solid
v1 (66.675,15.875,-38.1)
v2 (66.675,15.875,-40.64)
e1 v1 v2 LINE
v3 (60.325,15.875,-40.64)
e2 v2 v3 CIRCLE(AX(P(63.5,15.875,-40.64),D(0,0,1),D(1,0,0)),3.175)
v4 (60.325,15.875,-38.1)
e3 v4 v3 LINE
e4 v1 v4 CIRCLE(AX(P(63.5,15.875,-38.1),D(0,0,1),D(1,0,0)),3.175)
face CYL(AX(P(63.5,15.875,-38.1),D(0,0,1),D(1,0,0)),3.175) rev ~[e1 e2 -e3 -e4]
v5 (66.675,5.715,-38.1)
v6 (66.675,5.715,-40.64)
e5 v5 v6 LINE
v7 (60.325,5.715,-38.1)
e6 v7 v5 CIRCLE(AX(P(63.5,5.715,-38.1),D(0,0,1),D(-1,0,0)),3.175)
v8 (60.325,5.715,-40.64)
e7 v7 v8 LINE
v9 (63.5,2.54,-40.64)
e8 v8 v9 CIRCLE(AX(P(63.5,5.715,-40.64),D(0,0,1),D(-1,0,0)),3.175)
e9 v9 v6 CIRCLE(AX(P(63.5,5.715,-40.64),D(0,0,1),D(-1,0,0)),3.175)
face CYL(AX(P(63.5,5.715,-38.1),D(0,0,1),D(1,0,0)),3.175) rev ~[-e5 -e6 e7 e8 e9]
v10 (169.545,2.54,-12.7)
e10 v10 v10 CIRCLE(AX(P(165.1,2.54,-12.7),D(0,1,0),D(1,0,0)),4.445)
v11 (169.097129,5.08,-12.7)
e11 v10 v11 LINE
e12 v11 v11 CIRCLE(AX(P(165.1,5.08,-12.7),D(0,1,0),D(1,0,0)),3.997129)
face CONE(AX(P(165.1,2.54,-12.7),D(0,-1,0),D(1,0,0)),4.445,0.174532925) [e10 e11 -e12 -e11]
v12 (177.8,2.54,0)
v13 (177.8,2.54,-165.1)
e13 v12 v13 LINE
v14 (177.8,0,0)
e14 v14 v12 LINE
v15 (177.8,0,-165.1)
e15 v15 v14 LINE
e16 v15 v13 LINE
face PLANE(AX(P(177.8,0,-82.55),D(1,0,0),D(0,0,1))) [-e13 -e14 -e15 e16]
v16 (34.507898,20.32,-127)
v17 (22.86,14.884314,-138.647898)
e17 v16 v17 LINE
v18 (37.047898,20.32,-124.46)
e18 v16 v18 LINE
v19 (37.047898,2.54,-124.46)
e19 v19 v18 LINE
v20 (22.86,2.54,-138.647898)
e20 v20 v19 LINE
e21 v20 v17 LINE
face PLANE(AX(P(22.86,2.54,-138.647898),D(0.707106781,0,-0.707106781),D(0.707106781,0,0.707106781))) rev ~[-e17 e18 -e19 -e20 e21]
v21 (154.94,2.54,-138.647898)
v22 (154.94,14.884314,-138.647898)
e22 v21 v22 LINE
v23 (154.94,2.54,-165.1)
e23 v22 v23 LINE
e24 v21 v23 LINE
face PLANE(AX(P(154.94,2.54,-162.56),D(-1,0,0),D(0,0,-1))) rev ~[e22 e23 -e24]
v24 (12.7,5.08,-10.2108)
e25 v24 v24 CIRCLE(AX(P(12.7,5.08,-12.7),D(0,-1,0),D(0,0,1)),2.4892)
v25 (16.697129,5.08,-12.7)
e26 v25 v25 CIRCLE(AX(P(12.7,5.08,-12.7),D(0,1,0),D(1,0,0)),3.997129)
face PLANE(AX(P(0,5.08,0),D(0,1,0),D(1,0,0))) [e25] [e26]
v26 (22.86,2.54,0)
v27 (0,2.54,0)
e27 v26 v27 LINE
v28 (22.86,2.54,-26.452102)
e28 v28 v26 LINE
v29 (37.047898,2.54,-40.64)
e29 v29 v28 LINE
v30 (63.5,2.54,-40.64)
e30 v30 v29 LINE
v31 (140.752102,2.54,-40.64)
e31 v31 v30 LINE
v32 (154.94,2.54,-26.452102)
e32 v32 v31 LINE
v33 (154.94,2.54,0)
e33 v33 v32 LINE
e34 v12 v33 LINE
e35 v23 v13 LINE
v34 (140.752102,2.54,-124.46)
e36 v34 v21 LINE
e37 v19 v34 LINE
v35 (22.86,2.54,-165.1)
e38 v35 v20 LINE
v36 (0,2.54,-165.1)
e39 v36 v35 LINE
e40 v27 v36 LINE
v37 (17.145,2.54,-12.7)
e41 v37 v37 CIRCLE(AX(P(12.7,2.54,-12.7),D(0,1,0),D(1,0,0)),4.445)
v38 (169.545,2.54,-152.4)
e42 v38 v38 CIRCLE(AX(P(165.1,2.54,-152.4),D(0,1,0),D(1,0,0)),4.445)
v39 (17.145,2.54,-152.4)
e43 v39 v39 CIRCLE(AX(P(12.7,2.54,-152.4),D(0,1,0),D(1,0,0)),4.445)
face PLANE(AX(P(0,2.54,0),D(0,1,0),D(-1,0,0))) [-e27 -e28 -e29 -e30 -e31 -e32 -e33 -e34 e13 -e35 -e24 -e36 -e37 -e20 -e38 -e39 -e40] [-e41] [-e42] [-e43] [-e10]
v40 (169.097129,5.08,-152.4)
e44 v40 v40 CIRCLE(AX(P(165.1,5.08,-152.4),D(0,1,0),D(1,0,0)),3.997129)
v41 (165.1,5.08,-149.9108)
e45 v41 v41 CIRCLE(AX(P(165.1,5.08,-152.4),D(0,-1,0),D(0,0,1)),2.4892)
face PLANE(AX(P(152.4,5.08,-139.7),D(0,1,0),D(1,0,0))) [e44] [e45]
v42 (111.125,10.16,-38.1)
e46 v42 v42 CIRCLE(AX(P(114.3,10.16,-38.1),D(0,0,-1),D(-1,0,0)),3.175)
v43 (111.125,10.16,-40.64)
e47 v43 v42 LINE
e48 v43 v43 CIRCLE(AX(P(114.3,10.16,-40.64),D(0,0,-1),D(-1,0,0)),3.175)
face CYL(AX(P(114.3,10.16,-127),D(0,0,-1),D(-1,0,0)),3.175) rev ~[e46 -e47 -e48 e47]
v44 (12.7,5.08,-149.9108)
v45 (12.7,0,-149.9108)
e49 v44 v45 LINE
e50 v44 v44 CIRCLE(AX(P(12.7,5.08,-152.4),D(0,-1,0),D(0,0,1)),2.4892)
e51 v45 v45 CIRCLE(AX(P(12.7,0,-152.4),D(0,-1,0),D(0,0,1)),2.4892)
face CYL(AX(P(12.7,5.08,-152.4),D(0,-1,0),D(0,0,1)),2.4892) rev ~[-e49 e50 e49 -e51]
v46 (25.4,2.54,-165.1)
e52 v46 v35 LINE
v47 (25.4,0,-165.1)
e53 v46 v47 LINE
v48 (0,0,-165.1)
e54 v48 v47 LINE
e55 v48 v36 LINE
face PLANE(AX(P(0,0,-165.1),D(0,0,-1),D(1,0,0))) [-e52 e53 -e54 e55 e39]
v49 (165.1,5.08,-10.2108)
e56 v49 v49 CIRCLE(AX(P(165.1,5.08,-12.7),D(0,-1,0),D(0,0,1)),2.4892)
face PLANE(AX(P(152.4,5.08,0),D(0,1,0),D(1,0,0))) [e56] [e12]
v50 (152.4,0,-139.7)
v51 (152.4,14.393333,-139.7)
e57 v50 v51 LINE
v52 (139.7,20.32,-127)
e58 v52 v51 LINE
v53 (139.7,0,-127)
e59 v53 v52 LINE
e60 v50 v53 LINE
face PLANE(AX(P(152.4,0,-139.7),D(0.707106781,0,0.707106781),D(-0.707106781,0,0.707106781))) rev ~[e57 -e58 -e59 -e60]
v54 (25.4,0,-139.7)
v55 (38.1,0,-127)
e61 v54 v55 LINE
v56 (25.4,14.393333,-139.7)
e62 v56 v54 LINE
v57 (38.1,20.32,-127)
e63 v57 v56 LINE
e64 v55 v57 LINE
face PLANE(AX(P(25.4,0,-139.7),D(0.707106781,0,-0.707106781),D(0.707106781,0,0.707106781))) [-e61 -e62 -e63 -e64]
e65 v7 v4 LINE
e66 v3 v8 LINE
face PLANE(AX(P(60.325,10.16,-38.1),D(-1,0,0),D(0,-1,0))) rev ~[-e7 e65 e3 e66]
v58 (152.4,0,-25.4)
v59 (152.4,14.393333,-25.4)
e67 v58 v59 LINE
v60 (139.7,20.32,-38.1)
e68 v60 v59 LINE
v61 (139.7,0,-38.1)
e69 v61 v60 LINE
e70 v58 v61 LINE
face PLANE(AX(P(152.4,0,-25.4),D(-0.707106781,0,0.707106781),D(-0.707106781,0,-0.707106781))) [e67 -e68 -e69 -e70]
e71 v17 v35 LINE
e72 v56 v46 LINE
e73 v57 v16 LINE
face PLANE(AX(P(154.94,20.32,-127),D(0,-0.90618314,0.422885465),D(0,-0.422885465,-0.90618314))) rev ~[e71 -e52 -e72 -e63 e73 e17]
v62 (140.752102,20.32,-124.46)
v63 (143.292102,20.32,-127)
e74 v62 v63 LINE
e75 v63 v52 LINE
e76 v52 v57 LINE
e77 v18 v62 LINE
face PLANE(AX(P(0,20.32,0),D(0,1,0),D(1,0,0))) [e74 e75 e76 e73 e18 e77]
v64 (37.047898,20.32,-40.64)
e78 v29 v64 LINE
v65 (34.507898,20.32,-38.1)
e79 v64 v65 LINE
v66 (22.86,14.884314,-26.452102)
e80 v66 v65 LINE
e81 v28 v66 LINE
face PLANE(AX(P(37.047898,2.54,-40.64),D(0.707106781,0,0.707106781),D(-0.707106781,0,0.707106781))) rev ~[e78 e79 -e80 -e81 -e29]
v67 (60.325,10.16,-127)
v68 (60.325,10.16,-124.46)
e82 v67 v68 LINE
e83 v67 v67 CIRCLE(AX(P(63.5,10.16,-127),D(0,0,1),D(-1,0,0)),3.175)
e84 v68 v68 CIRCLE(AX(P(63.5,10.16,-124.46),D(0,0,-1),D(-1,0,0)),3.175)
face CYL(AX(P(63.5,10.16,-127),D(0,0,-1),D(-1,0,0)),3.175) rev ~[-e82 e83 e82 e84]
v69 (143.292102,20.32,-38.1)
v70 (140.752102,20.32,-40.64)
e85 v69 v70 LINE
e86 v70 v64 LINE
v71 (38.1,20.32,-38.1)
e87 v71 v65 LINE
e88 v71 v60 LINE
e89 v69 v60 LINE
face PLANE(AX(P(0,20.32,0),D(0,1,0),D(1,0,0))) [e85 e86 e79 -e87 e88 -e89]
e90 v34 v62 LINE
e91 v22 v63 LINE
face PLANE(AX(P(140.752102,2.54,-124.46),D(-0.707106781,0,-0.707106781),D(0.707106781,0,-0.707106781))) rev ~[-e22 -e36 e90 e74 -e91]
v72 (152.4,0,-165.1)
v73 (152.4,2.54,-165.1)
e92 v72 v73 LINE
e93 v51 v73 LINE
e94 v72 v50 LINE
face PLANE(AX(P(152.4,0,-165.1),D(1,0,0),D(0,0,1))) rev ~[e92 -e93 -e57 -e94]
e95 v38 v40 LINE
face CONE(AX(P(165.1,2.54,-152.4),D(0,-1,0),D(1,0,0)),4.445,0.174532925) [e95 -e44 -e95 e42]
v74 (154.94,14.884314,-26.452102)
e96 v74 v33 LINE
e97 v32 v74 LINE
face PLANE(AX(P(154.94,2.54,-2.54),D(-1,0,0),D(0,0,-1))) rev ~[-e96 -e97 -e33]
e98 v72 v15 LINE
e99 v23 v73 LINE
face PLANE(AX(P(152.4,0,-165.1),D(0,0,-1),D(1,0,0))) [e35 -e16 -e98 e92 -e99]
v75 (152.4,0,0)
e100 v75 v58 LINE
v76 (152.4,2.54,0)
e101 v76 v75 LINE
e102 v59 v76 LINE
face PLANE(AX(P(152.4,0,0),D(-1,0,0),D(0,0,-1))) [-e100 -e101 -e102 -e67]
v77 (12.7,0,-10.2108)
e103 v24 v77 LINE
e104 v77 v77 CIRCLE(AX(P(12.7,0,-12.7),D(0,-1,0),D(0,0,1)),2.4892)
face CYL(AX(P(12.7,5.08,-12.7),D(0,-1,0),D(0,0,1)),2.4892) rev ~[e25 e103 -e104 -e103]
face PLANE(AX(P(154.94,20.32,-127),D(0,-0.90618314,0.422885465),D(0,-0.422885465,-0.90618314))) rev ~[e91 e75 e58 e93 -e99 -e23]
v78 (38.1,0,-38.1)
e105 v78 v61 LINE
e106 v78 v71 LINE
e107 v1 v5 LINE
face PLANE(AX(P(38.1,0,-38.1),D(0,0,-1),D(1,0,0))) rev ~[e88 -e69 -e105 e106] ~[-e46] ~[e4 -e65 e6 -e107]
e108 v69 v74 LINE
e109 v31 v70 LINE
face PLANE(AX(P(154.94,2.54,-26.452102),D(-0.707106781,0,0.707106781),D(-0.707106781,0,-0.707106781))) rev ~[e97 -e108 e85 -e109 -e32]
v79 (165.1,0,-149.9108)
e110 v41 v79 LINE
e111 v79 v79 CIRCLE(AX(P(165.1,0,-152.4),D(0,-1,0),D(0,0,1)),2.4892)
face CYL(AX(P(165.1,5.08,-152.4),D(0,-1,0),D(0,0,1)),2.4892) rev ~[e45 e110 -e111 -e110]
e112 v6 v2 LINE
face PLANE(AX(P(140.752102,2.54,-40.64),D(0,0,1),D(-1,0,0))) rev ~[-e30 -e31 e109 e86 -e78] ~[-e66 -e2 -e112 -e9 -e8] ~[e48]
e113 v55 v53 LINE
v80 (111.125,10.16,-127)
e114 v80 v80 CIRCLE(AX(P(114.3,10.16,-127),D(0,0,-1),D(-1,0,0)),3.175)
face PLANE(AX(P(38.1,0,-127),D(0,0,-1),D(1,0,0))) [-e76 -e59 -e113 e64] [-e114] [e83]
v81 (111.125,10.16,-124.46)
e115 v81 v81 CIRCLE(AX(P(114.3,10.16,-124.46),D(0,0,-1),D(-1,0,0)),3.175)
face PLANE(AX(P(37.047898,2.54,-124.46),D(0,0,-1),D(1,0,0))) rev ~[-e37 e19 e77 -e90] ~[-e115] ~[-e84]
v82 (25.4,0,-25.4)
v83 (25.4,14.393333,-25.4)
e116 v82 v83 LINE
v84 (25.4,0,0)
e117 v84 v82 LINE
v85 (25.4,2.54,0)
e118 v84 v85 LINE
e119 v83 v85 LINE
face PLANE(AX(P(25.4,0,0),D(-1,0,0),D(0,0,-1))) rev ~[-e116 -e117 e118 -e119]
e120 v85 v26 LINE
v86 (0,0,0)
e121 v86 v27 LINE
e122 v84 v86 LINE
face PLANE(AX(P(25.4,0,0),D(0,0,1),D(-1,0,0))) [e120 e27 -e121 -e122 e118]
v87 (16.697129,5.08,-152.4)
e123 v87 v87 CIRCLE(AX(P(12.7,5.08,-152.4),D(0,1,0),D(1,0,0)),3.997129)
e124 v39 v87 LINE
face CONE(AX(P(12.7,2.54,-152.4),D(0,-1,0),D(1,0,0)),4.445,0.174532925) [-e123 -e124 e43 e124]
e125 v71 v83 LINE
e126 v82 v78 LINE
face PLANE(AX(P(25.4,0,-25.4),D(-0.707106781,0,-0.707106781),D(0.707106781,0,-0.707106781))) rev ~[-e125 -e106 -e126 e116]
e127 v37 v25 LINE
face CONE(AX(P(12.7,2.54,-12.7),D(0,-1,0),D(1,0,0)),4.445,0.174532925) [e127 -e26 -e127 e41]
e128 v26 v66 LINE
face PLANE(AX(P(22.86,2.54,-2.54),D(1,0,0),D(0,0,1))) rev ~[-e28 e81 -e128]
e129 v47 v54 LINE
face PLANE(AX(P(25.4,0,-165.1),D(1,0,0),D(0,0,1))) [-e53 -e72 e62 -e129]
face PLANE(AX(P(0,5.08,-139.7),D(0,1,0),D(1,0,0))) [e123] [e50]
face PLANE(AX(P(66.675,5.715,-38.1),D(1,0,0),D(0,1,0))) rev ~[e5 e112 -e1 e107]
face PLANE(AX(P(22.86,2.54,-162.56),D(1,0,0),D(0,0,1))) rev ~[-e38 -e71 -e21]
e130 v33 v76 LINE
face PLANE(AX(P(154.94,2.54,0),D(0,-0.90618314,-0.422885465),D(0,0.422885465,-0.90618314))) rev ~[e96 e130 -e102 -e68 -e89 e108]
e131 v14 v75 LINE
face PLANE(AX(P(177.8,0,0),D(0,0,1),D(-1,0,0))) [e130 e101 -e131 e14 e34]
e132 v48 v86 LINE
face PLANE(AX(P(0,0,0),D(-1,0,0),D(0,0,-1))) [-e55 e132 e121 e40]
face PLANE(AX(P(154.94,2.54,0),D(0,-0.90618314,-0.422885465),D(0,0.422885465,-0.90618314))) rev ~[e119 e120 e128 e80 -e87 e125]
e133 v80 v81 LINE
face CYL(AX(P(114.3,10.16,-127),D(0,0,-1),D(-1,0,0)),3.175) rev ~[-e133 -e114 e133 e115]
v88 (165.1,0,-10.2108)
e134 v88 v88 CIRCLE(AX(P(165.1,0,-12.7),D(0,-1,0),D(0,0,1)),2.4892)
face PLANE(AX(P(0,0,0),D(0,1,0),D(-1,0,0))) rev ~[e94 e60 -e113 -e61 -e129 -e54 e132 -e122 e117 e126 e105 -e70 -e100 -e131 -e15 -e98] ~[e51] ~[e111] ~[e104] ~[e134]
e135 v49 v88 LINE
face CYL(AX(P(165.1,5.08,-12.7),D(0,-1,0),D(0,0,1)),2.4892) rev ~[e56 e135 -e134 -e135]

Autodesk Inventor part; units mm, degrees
ref_plane "YZ Plane" through (0, 0, 0) normal (1, 0, 0) x (0, 1, 0)
ref_plane "XZ Plane" through (0, 0, 0) normal (0, 1, 0) x (-1, 0, 0)
ref_plane "XY Plane" through (0, 0, 0) normal (0, 0, 1) x (1, 0, 0)
sketch "Sketch1" plane through (0, 0, 0) normal (0, 1, 0) x (-1, 0, 0)
  line L0 (0, 0) -> (0, -165.1)
  line L1 (0, -165.1) -> (-177.8, -165.1)
  line L2 (-177.8, -165.1) -> (-177.8, 0)
  line L3 (-177.8, 0) -> (0, 0)
  line L4 (0, 0) -> (-25.4, 0)
  line L5 (-177.8, 0) -> (-152.4, 0)
  line L6 (0, -165.1) -> (-25.4, -165.1)
  line L7 (-177.8, -165.1) -> (-152.4, -165.1)
  line L8 (-152.4, 0) -> (-152.4, -25.4)
  line L9 (-152.4, -165.1) -> (-152.4, -139.7)
  line L10 (-25.4, 0) -> (-25.4, -25.4)
  line L11 (-25.4, -165.1) -> (-25.4, -139.7)
  line L12 (-38.1, -38.1) -> (-139.7, -38.1)
  line L13 (-25.4, -25.4) -> (-38.1, -38.1)
  line L14 (-25.4, -25.4) -> (-7.439488, -25.4) construction
  line L15 (-152.4, -25.4) -> (-139.7, -38.1)
  line L16 (-177.8, -82.55) -> (0, -82.55)
  line L17 (-152.4, -165.1) -> (-152.4, -139.7)
  line L18 (-25.4, -165.1) -> (-25.4, -139.7)
  line L19 (-38.1, -127) -> (-139.7, -127)
  line L20 (-25.4, -139.7) -> (-38.1, -127)
  line L21 (-152.4, -139.7) -> (-139.7, -127)
  dimension "d1" = 165.1
  dimension "d2" = 177.8
  dimension "d3" = 25.4
  dimension "d4" = 25.4
  dimension "d6" = 25.4
  dimension "d7" = 25.4
  dimension "d10" = 25.4
  dimension "d11" = 25.4
  dimension "d12" = 25.4
  dimension "d13" = 25.4
  dimension "d16" = 101.6
  dimension "d17" = 135
  dimension "d18" = 135
extrude "Extrusion1" add sketch "Sketch1" along normal blind 2.54 contours L0 L16 L2 L3 L8 L15 L12 L13 L10 | L0 L1 L11 L20 L19 L21 L9 L2 L16
sketch "Sketch2" plane through (0, 2.54, 0) normal (0, 1, 0) x (1, 0, 0)
  line L0 (25.4, 139.7) -> (25.4, 165.1)
  line L1 (25.4, 165.1) -> (0, 165.1)
  line L2 (0, 165.1) -> (0, 0)
  line L3 (0, 0) -> (25.4, 0)
  line L4 (25.4, 0) -> (25.4, 25.4)
  line L5 (25.4, 25.4) -> (38.1, 38.1)
  line L6 (38.1, 38.1) -> (139.7, 38.1)
  line L7 (139.7, 38.1) -> (152.4, 25.4)
  line L8 (152.4, 25.4) -> (152.4, 0)
  line L9 (152.4, 0) -> (177.8, 0)
  line L10 (177.8, 0) -> (177.8, 165.1)
  line L11 (177.8, 165.1) -> (152.4, 165.1)
  line L12 (152.4, 165.1) -> (152.4, 139.7)
  line L13 (152.4, 139.7) -> (139.7, 127)
  line L14 (139.7, 127) -> (38.1, 127)
  line L15 (38.1, 127) -> (25.4, 139.7)
  line L16 (2.54, 2.54) -> (2.54, 162.56)
  line L17 (2.54, 162.56) -> (22.86, 162.56)
  line L18 (22.86, 162.56) -> (22.86, 138.647898)
  line L19 (22.86, 138.647898) -> (37.047898, 124.46)
  line L20 (37.047898, 124.46) -> (140.752102, 124.46)
  line L21 (140.752102, 124.46) -> (154.94, 138.647898)
  line L22 (154.94, 138.647898) -> (154.94, 162.56)
  line L23 (154.94, 162.56) -> (175.26, 162.56)
  line L24 (175.26, 162.56) -> (175.26, 2.54)
  line L25 (175.26, 2.54) -> (154.94, 2.54)
  line L26 (154.94, 2.54) -> (154.94, 26.452102)
  line L27 (154.94, 26.452102) -> (140.752102, 40.64)
  line L28 (140.752102, 40.64) -> (37.047898, 40.64)
  line L29 (37.047898, 40.64) -> (22.86, 26.452102)
  line L30 (22.86, 26.452102) -> (22.86, 2.54)
  line L31 (22.86, 2.54) -> (2.54, 2.54)
  line L32 (22.86, 2.54) -> (22.86, 0)
  line L33 (154.94, 2.54) -> (154.94, 0)
  line L34 (154.94, 162.56) -> (154.94, 165.1)
  line L35 (22.86, 162.56) -> (22.86, 165.1)
  dimension "d21" = 2.54
extrude "Extrusion2" add sketch "Sketch2" along normal blind 17.78 contours L15 L14 L13 L12 L11 L34 L22 L21 L20 L19 L18 L35 L1 L0 | L32 L30 L29 L28 L27 L26 L33 L9 L8 L7 L6 L5 L4 L3
sketch "Sketch3" plane through (154.94, 2.54, 0) normal (1, 0, 0) x (0, 0, -1)
  line L0 (165.1, 0) -> (0, 0)
  line L1 (26.452102, 0) -> (26.452102, 17.78)
  line L2 (0, 17.78) -> (0, 0)
  line L3 (38.1, -2.54) -> (38.1, 17.78)
  line L4 (0, 0) -> (38.1, 17.78)
  line L5 (38.1, 17.78) -> (0, 17.78)
  line L6 (165.1, -2.54) -> (165.1, 17.78)
  line L7 (165.1, 0) -> (165.1, 17.78)
  line L8 (127, -2.54) -> (127, 17.78)
  line L9 (165.1, 17.78) -> (127, 17.78)
  line L10 (127, 17.78) -> (165.1, 0)
  point P0 (0, -2.54)
  dimension "d24" = 17.78
extrude "Extrusion3" cut sketch "Sketch3" against normal blind 132.08 contours L2 L5 L1 L4 | L1 L5 L4 | L10 L9 L6
sketch "Sketch4" plane through (0, 2.54, 0) normal (0, 1, 0) x (1, 0, 0)
  line L0 (0, 0) -> (0, 25.4)
  line L1 (0, 165.1) -> (0, 0) projected
  line L2 (0, 25.4) -> (25.4, 25.4)
  line L3 (0, 0) -> (25.4, 0) projected
  line L4 (25.4, 25.4) -> (0, 0)
  line L5 (0, 25.4) -> (25.4, 0)
  circle A0 centre (12.7, 12.7) radius 4.445
  dimension "d27" = 25.4
  dimension "d28" = 25.4
  dimension "d29" = 8.89
sketch "Sketch4 outline for Extrusion4" plane through (0, 2.54, 0) normal (0, 1, 0) x (1, 0, 0)
  circle A0 centre (12.7, 12.7) radius 4.445
extrude "Extrusion4" add sketch "Sketch4 outline for Extrusion4" along normal blind 2.54 draft -10
sketch "Sketch5" plane through (12.7, 5.08, -12.7) normal (0, 1, 0) x (1, 0, 0)
  circle A0 centre (0, 0) radius 3.997129
  line L0 (0, -3.997129) -> (0, 3.997129)
  line L1 (3.997129, 0) -> (-3.997129, 0)
  point P0 (-12.7, -12.7)
  dimension "d32" = 7.99426
  dimension "d33" = 7.99426
hole "Hole1" at (12.7, 5.08, -12.7) direction (0, -1, 0) diameter 4.9784 end through all thread size "1/4-20 UNC" class "2B" standard "ANSI Unified Screw Threads"
pattern_linear "Rectangular Pattern1" count 2 spacing 139.7 along (0, 0, -1) count 2 spacing 152.4 along (1, 0, 0) of "Hole1", "Extrusion4"
sketch "Sketch6" plane through (139.7, 0, -127) normal (0, 0, -1) x (-1, 0, 0)
  line L0 (101.6, 0) -> (101.6, 20.32) projected
  line L1 (0, 0) -> (0, 20.32) projected
  line L2 (101.6, 0) -> (0, 20.32)
  line L3 (0, 20.32) -> (0, 0)
  line L4 (0, 0) -> (101.6, 20.32)
  line L5 (50.8, 10.16) -> (76.2, 10.16)
  line L6 (50.8, 10.16) -> (25.4, 10.16)
  circle A0 centre (76.2, 10.16) radius 3.175
  circle A1 centre (25.4, 10.16) radius 3.175
  point P0 (139.7, 0)
  dimension "d48" = 101.6
  dimension "d49" = 22.6199
  dimension "d51" = 25.4
  dimension "d52" = 25.4
  dimension "d53" = 6.35
  dimension "d54" = 6.35
extrude "Extrusion5" cut sketch "Sketch6" against normal blind 88.9 contours A0 | A1
sketch "Sketch7" plane through (38.1, 0, -38.1) normal (0, 0, 1) x (1, 0, 0)
  circle A0 centre (25.4, 10.16) radius 3.175 projected
  line L0 (25.4, 10.16) -> (22.225, 10.16)
  line L1 (22.225, 10.16) -> (22.225, 5.715)
  line L2 (22.225, 5.715) -> (25.4, 5.715)
  circle A1 centre (25.4, 5.715) radius 3.175
  line L3 (28.575, 5.715) -> (28.575, 15.875)
  line L4 (28.575, 15.875) -> (25.4, 15.875)
  circle A2 centre (25.4, 15.875) radius 3.175
  line L5 (22.225, 10.16) -> (22.225, 15.875)
  line L6 (25.4, 0) -> (25.4, 2.54)
  point P0 (-38.1, 0)
  point P1 (22.225, 13.0175)
  dimension "d58" = 6.35
  dimension "d57" = 4.445
  dimension "d60" = 6.35
  dimension "d61" = 6.35
  dimension "d62" = 5.715
  dimension "d63" = 2.54
  dimension "d64" = 3.175
  dimension "d65" = 13.335
extrude "Extrusion6" cut sketch "Sketch7" against normal blind 2.54
properties part number "ChairBaseBracket"
